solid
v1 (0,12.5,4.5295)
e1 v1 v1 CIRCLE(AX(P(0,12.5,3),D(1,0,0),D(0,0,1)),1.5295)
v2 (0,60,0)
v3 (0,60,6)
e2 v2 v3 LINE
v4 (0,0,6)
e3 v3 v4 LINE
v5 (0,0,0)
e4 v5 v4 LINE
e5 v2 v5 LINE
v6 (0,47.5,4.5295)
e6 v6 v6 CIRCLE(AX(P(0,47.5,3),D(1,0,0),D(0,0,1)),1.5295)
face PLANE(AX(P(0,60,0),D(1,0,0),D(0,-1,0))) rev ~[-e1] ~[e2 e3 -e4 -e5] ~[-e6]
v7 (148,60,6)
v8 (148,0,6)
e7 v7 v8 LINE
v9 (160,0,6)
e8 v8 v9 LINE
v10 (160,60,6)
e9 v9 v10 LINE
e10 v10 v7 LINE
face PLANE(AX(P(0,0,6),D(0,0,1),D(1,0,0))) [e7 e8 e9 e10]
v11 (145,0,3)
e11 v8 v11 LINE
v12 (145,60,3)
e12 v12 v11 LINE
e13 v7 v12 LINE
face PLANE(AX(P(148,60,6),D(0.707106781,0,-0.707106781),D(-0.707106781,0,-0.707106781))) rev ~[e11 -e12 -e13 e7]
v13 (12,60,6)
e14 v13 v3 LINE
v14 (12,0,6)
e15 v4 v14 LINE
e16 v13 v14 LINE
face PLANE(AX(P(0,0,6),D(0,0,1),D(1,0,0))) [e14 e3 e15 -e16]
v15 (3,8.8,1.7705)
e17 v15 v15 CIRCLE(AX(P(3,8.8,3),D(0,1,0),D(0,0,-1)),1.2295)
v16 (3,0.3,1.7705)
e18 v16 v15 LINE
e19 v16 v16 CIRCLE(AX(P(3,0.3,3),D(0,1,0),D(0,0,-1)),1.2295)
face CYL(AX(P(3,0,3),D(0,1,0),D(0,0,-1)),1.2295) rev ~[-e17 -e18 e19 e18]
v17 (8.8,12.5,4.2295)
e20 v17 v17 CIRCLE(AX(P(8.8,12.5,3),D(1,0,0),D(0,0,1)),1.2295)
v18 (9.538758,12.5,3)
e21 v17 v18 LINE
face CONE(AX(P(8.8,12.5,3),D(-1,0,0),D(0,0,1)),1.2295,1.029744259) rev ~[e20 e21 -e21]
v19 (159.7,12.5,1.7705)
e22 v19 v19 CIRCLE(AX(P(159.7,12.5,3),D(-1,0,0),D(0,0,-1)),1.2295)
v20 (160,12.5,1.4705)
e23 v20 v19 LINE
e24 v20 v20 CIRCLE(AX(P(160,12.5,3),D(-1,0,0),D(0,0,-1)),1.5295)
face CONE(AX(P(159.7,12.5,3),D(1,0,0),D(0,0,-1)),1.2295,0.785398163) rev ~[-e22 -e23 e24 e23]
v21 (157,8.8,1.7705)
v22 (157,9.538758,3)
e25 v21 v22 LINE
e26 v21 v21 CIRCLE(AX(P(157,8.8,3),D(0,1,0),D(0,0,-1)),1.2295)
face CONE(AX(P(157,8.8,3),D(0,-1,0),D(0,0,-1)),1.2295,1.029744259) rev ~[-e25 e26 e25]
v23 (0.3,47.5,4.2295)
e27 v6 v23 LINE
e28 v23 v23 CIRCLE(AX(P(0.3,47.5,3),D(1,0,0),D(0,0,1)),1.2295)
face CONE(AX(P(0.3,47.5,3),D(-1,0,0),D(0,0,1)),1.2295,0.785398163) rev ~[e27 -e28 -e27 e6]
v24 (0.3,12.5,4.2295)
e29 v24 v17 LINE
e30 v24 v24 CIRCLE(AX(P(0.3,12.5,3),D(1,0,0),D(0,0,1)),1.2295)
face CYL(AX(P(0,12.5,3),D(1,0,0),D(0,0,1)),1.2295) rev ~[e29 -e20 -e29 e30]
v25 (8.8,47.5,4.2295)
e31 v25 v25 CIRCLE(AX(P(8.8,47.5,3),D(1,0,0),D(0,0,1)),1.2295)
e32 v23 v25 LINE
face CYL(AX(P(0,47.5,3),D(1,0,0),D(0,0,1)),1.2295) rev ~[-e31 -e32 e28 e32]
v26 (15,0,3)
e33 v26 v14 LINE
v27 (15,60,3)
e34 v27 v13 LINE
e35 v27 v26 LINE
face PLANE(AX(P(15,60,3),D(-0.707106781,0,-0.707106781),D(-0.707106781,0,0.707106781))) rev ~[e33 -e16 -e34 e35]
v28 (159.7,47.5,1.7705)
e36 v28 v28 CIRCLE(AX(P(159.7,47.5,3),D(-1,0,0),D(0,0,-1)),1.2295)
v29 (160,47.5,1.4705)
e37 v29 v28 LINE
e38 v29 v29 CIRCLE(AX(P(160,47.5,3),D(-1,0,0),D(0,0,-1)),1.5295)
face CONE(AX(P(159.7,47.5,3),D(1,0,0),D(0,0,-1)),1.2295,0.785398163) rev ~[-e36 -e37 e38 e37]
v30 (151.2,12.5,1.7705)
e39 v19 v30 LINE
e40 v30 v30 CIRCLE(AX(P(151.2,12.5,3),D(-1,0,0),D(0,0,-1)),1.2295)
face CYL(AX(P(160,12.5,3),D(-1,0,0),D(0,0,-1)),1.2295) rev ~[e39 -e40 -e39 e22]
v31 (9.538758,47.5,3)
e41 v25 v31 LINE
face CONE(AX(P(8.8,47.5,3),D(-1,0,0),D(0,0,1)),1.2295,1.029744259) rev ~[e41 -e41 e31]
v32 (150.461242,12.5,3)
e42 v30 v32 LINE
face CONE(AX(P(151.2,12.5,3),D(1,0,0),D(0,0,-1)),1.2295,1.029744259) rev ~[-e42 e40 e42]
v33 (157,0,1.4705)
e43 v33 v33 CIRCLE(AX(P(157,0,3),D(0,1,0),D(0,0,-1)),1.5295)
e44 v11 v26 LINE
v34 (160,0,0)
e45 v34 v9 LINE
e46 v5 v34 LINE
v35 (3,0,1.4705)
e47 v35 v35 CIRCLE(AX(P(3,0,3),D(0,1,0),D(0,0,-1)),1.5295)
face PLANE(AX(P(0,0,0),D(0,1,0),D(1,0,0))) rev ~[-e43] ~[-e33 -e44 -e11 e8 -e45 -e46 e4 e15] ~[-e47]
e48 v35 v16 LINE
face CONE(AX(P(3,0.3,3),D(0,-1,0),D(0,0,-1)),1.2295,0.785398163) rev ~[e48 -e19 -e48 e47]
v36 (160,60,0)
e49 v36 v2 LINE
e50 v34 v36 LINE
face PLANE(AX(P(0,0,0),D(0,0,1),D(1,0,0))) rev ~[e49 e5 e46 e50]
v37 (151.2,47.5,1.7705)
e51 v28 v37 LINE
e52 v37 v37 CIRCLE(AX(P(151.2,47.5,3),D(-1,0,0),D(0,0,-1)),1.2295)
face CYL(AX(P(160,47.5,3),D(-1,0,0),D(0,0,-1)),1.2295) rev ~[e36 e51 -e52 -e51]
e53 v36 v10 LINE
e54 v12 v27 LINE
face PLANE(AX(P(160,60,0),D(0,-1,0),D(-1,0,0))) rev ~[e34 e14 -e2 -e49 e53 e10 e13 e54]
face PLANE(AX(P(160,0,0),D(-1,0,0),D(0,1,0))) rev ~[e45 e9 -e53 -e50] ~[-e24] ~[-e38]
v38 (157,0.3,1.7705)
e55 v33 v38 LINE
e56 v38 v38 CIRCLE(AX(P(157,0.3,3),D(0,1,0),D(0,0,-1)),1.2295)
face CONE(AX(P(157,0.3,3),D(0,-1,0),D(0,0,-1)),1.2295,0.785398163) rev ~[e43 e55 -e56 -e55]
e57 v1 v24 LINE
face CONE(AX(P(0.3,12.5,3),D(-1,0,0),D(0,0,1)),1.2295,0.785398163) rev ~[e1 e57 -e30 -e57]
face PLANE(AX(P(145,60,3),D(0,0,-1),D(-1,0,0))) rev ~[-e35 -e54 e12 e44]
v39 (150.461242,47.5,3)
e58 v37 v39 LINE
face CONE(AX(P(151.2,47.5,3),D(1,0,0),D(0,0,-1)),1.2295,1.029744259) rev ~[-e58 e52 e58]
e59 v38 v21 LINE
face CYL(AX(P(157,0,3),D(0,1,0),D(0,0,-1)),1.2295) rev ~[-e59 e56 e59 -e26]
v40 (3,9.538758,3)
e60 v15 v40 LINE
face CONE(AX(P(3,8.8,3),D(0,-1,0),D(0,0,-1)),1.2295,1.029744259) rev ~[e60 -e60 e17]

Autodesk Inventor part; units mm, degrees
ref_plane "YZ Plane" through (0, 0, 0) normal (1, 0, 0) x (0, 1, 0)
ref_plane "XZ Plane" through (0, 0, 0) normal (0, 1, 0) x (-1, 0, 0)
ref_plane "XY Plane" through (0, 0, 0) normal (0, 0, 1) x (1, 0, 0)
sketch "Sketch1" plane through (0, 0, 0) normal (0, 0, 1) x (1, 0, 0)
  line L0 (0, 0) -> (160, 0)
  line L1 (160, 0) -> (160, 60)
  line L2 (160, 60) -> (0, 60)
  line L3 (0, 60) -> (0, 0)
  dimension "d0" = 160
  dimension "d1" = 60
extrude "Extrusion1" add sketch "Sketch1" along normal blind 6
sketch "Sketch2" plane through (0, 0, 0) normal (0, -1, 0) x (1, 0, 0)
  line L0 (3, 3) -> (157, 3) construction
  line L1 (160, 0) -> (0, 0) construction
  line L2 (0, 6) -> (160, 6) construction
  line L3 (160, 0) -> (160, 6) construction
  line L4 (0, 0) -> (0, 6) construction
  point P0 (0, 3)
  dimension "d4" = 3
  dimension "d5" = 6
  dimension "d6" = 3
  dimension "d7" = 3
hole "Hole1" at (3, 0, 3) at (157, 0, 3) direction (0, 1, 0) diameter 2.459 depth 8.8 tip angle 118 thread size "M3x0.5" class "6H" standard "ISO Metric profile"
chamfer "Chamfer1" distance 0.3 angle 45 2 edges at (3, 0, 4.2295) (157, 0, 4.2295)
sketch "Sketch3" plane through (0, 60, 0) normal (0, 1, 0) x (1, 0, 0)
  line L0 (160, -6) -> (0, -6) projected
  line L1 (148, -6) -> (145, -3)
  line L2 (148, -6) -> (152.2426, -6) construction
  line L3 (145, -3) -> (15, -3)
  line L4 (160, 0) -> (0, 0) projected
  line L5 (15, -3) -> (12, -6)
  line L6 (12, -6) -> (148, -6)
  line L7 (160, 0) -> (160, -6) projected
  line L8 (0, 0) -> (0, -6) projected
  point P0 (12, -6)
  point P1 (0, -3)
  dimension "d18" = 135
  dimension "d19" = 3
  dimension "d22" = 15
  dimension "d23" = 130
  dimension "d24" = 15
extrude "Extrusion2" cut sketch "Sketch3" against normal through all contours L0 L5 L3 L1
sketch "Sketch6" plane through (160, 0, 0) normal (1, 0, 0) x (0, 0, -1)
  line L0 (-3, 60) -> (-3, 0) projected
  circle A0 centre (-3, 12.5) radius 1.5
  circle A1 centre (-3, 47.5) radius 1.5
  line L1 (0, 0) -> (-6, 0) projected
  line L2 (0, 60) -> (-6, 60) projected
  dimension "d34" = 3
  dimension "d35" = 3
  dimension "d36" = 35
  dimension "d37" = 12.5
  dimension "d38" = 60
hole "Hole2" at (160, 12.5, 3) at (160, 47.5, 3) direction (-1, 0, 0) diameter 2.459 depth 8.8 tip angle 118 thread size "M3x0.5" class "6H" standard "ISO Metric profile"
sketch "Sketch7" plane through (0, 0, 0) normal (-1, 0, 0) x (0, 0, 1)
  line L0 (3, 60) -> (3, 0) projected
  circle A0 centre (3, 12.5) radius 1.5
  circle A1 centre (3, 47.5) radius 1.5
  line L1 (0, 60) -> (6, 60) projected
  line L2 (0, 0) -> (6, 0) projected
  dimension "d46" = 3
  dimension "d47" = 3
  dimension "d48" = 35
  dimension "d49" = 60
  dimension "d50" = 12.5
hole "Hole3" at (0, 47.5, 3) at (0, 12.5, 3) direction (1, 0, 0) diameter 2.459 depth 8.8 tip angle 118 thread size "M3x0.5" class "6H" standard "ISO Metric profile"
chamfer "Chamfer2" distance 0.3 angle 45 4 edges at (0, 47.5, 1.7705) (0, 12.5, 1.7705) (160, 47.5, 4.2295) (160, 12.5, 4.2295)
equation "\"d4\" = 0.5 * d5"
equation "\"d7\" = d6"
equation "\"d22\" = d24"
equation "\"d37\" = -0.5 * d36 + 0.5 * d38"
equation "\"d50\" = -0.5 * d48 + 0.5 * d49"
properties part number "Prawa ściana"
